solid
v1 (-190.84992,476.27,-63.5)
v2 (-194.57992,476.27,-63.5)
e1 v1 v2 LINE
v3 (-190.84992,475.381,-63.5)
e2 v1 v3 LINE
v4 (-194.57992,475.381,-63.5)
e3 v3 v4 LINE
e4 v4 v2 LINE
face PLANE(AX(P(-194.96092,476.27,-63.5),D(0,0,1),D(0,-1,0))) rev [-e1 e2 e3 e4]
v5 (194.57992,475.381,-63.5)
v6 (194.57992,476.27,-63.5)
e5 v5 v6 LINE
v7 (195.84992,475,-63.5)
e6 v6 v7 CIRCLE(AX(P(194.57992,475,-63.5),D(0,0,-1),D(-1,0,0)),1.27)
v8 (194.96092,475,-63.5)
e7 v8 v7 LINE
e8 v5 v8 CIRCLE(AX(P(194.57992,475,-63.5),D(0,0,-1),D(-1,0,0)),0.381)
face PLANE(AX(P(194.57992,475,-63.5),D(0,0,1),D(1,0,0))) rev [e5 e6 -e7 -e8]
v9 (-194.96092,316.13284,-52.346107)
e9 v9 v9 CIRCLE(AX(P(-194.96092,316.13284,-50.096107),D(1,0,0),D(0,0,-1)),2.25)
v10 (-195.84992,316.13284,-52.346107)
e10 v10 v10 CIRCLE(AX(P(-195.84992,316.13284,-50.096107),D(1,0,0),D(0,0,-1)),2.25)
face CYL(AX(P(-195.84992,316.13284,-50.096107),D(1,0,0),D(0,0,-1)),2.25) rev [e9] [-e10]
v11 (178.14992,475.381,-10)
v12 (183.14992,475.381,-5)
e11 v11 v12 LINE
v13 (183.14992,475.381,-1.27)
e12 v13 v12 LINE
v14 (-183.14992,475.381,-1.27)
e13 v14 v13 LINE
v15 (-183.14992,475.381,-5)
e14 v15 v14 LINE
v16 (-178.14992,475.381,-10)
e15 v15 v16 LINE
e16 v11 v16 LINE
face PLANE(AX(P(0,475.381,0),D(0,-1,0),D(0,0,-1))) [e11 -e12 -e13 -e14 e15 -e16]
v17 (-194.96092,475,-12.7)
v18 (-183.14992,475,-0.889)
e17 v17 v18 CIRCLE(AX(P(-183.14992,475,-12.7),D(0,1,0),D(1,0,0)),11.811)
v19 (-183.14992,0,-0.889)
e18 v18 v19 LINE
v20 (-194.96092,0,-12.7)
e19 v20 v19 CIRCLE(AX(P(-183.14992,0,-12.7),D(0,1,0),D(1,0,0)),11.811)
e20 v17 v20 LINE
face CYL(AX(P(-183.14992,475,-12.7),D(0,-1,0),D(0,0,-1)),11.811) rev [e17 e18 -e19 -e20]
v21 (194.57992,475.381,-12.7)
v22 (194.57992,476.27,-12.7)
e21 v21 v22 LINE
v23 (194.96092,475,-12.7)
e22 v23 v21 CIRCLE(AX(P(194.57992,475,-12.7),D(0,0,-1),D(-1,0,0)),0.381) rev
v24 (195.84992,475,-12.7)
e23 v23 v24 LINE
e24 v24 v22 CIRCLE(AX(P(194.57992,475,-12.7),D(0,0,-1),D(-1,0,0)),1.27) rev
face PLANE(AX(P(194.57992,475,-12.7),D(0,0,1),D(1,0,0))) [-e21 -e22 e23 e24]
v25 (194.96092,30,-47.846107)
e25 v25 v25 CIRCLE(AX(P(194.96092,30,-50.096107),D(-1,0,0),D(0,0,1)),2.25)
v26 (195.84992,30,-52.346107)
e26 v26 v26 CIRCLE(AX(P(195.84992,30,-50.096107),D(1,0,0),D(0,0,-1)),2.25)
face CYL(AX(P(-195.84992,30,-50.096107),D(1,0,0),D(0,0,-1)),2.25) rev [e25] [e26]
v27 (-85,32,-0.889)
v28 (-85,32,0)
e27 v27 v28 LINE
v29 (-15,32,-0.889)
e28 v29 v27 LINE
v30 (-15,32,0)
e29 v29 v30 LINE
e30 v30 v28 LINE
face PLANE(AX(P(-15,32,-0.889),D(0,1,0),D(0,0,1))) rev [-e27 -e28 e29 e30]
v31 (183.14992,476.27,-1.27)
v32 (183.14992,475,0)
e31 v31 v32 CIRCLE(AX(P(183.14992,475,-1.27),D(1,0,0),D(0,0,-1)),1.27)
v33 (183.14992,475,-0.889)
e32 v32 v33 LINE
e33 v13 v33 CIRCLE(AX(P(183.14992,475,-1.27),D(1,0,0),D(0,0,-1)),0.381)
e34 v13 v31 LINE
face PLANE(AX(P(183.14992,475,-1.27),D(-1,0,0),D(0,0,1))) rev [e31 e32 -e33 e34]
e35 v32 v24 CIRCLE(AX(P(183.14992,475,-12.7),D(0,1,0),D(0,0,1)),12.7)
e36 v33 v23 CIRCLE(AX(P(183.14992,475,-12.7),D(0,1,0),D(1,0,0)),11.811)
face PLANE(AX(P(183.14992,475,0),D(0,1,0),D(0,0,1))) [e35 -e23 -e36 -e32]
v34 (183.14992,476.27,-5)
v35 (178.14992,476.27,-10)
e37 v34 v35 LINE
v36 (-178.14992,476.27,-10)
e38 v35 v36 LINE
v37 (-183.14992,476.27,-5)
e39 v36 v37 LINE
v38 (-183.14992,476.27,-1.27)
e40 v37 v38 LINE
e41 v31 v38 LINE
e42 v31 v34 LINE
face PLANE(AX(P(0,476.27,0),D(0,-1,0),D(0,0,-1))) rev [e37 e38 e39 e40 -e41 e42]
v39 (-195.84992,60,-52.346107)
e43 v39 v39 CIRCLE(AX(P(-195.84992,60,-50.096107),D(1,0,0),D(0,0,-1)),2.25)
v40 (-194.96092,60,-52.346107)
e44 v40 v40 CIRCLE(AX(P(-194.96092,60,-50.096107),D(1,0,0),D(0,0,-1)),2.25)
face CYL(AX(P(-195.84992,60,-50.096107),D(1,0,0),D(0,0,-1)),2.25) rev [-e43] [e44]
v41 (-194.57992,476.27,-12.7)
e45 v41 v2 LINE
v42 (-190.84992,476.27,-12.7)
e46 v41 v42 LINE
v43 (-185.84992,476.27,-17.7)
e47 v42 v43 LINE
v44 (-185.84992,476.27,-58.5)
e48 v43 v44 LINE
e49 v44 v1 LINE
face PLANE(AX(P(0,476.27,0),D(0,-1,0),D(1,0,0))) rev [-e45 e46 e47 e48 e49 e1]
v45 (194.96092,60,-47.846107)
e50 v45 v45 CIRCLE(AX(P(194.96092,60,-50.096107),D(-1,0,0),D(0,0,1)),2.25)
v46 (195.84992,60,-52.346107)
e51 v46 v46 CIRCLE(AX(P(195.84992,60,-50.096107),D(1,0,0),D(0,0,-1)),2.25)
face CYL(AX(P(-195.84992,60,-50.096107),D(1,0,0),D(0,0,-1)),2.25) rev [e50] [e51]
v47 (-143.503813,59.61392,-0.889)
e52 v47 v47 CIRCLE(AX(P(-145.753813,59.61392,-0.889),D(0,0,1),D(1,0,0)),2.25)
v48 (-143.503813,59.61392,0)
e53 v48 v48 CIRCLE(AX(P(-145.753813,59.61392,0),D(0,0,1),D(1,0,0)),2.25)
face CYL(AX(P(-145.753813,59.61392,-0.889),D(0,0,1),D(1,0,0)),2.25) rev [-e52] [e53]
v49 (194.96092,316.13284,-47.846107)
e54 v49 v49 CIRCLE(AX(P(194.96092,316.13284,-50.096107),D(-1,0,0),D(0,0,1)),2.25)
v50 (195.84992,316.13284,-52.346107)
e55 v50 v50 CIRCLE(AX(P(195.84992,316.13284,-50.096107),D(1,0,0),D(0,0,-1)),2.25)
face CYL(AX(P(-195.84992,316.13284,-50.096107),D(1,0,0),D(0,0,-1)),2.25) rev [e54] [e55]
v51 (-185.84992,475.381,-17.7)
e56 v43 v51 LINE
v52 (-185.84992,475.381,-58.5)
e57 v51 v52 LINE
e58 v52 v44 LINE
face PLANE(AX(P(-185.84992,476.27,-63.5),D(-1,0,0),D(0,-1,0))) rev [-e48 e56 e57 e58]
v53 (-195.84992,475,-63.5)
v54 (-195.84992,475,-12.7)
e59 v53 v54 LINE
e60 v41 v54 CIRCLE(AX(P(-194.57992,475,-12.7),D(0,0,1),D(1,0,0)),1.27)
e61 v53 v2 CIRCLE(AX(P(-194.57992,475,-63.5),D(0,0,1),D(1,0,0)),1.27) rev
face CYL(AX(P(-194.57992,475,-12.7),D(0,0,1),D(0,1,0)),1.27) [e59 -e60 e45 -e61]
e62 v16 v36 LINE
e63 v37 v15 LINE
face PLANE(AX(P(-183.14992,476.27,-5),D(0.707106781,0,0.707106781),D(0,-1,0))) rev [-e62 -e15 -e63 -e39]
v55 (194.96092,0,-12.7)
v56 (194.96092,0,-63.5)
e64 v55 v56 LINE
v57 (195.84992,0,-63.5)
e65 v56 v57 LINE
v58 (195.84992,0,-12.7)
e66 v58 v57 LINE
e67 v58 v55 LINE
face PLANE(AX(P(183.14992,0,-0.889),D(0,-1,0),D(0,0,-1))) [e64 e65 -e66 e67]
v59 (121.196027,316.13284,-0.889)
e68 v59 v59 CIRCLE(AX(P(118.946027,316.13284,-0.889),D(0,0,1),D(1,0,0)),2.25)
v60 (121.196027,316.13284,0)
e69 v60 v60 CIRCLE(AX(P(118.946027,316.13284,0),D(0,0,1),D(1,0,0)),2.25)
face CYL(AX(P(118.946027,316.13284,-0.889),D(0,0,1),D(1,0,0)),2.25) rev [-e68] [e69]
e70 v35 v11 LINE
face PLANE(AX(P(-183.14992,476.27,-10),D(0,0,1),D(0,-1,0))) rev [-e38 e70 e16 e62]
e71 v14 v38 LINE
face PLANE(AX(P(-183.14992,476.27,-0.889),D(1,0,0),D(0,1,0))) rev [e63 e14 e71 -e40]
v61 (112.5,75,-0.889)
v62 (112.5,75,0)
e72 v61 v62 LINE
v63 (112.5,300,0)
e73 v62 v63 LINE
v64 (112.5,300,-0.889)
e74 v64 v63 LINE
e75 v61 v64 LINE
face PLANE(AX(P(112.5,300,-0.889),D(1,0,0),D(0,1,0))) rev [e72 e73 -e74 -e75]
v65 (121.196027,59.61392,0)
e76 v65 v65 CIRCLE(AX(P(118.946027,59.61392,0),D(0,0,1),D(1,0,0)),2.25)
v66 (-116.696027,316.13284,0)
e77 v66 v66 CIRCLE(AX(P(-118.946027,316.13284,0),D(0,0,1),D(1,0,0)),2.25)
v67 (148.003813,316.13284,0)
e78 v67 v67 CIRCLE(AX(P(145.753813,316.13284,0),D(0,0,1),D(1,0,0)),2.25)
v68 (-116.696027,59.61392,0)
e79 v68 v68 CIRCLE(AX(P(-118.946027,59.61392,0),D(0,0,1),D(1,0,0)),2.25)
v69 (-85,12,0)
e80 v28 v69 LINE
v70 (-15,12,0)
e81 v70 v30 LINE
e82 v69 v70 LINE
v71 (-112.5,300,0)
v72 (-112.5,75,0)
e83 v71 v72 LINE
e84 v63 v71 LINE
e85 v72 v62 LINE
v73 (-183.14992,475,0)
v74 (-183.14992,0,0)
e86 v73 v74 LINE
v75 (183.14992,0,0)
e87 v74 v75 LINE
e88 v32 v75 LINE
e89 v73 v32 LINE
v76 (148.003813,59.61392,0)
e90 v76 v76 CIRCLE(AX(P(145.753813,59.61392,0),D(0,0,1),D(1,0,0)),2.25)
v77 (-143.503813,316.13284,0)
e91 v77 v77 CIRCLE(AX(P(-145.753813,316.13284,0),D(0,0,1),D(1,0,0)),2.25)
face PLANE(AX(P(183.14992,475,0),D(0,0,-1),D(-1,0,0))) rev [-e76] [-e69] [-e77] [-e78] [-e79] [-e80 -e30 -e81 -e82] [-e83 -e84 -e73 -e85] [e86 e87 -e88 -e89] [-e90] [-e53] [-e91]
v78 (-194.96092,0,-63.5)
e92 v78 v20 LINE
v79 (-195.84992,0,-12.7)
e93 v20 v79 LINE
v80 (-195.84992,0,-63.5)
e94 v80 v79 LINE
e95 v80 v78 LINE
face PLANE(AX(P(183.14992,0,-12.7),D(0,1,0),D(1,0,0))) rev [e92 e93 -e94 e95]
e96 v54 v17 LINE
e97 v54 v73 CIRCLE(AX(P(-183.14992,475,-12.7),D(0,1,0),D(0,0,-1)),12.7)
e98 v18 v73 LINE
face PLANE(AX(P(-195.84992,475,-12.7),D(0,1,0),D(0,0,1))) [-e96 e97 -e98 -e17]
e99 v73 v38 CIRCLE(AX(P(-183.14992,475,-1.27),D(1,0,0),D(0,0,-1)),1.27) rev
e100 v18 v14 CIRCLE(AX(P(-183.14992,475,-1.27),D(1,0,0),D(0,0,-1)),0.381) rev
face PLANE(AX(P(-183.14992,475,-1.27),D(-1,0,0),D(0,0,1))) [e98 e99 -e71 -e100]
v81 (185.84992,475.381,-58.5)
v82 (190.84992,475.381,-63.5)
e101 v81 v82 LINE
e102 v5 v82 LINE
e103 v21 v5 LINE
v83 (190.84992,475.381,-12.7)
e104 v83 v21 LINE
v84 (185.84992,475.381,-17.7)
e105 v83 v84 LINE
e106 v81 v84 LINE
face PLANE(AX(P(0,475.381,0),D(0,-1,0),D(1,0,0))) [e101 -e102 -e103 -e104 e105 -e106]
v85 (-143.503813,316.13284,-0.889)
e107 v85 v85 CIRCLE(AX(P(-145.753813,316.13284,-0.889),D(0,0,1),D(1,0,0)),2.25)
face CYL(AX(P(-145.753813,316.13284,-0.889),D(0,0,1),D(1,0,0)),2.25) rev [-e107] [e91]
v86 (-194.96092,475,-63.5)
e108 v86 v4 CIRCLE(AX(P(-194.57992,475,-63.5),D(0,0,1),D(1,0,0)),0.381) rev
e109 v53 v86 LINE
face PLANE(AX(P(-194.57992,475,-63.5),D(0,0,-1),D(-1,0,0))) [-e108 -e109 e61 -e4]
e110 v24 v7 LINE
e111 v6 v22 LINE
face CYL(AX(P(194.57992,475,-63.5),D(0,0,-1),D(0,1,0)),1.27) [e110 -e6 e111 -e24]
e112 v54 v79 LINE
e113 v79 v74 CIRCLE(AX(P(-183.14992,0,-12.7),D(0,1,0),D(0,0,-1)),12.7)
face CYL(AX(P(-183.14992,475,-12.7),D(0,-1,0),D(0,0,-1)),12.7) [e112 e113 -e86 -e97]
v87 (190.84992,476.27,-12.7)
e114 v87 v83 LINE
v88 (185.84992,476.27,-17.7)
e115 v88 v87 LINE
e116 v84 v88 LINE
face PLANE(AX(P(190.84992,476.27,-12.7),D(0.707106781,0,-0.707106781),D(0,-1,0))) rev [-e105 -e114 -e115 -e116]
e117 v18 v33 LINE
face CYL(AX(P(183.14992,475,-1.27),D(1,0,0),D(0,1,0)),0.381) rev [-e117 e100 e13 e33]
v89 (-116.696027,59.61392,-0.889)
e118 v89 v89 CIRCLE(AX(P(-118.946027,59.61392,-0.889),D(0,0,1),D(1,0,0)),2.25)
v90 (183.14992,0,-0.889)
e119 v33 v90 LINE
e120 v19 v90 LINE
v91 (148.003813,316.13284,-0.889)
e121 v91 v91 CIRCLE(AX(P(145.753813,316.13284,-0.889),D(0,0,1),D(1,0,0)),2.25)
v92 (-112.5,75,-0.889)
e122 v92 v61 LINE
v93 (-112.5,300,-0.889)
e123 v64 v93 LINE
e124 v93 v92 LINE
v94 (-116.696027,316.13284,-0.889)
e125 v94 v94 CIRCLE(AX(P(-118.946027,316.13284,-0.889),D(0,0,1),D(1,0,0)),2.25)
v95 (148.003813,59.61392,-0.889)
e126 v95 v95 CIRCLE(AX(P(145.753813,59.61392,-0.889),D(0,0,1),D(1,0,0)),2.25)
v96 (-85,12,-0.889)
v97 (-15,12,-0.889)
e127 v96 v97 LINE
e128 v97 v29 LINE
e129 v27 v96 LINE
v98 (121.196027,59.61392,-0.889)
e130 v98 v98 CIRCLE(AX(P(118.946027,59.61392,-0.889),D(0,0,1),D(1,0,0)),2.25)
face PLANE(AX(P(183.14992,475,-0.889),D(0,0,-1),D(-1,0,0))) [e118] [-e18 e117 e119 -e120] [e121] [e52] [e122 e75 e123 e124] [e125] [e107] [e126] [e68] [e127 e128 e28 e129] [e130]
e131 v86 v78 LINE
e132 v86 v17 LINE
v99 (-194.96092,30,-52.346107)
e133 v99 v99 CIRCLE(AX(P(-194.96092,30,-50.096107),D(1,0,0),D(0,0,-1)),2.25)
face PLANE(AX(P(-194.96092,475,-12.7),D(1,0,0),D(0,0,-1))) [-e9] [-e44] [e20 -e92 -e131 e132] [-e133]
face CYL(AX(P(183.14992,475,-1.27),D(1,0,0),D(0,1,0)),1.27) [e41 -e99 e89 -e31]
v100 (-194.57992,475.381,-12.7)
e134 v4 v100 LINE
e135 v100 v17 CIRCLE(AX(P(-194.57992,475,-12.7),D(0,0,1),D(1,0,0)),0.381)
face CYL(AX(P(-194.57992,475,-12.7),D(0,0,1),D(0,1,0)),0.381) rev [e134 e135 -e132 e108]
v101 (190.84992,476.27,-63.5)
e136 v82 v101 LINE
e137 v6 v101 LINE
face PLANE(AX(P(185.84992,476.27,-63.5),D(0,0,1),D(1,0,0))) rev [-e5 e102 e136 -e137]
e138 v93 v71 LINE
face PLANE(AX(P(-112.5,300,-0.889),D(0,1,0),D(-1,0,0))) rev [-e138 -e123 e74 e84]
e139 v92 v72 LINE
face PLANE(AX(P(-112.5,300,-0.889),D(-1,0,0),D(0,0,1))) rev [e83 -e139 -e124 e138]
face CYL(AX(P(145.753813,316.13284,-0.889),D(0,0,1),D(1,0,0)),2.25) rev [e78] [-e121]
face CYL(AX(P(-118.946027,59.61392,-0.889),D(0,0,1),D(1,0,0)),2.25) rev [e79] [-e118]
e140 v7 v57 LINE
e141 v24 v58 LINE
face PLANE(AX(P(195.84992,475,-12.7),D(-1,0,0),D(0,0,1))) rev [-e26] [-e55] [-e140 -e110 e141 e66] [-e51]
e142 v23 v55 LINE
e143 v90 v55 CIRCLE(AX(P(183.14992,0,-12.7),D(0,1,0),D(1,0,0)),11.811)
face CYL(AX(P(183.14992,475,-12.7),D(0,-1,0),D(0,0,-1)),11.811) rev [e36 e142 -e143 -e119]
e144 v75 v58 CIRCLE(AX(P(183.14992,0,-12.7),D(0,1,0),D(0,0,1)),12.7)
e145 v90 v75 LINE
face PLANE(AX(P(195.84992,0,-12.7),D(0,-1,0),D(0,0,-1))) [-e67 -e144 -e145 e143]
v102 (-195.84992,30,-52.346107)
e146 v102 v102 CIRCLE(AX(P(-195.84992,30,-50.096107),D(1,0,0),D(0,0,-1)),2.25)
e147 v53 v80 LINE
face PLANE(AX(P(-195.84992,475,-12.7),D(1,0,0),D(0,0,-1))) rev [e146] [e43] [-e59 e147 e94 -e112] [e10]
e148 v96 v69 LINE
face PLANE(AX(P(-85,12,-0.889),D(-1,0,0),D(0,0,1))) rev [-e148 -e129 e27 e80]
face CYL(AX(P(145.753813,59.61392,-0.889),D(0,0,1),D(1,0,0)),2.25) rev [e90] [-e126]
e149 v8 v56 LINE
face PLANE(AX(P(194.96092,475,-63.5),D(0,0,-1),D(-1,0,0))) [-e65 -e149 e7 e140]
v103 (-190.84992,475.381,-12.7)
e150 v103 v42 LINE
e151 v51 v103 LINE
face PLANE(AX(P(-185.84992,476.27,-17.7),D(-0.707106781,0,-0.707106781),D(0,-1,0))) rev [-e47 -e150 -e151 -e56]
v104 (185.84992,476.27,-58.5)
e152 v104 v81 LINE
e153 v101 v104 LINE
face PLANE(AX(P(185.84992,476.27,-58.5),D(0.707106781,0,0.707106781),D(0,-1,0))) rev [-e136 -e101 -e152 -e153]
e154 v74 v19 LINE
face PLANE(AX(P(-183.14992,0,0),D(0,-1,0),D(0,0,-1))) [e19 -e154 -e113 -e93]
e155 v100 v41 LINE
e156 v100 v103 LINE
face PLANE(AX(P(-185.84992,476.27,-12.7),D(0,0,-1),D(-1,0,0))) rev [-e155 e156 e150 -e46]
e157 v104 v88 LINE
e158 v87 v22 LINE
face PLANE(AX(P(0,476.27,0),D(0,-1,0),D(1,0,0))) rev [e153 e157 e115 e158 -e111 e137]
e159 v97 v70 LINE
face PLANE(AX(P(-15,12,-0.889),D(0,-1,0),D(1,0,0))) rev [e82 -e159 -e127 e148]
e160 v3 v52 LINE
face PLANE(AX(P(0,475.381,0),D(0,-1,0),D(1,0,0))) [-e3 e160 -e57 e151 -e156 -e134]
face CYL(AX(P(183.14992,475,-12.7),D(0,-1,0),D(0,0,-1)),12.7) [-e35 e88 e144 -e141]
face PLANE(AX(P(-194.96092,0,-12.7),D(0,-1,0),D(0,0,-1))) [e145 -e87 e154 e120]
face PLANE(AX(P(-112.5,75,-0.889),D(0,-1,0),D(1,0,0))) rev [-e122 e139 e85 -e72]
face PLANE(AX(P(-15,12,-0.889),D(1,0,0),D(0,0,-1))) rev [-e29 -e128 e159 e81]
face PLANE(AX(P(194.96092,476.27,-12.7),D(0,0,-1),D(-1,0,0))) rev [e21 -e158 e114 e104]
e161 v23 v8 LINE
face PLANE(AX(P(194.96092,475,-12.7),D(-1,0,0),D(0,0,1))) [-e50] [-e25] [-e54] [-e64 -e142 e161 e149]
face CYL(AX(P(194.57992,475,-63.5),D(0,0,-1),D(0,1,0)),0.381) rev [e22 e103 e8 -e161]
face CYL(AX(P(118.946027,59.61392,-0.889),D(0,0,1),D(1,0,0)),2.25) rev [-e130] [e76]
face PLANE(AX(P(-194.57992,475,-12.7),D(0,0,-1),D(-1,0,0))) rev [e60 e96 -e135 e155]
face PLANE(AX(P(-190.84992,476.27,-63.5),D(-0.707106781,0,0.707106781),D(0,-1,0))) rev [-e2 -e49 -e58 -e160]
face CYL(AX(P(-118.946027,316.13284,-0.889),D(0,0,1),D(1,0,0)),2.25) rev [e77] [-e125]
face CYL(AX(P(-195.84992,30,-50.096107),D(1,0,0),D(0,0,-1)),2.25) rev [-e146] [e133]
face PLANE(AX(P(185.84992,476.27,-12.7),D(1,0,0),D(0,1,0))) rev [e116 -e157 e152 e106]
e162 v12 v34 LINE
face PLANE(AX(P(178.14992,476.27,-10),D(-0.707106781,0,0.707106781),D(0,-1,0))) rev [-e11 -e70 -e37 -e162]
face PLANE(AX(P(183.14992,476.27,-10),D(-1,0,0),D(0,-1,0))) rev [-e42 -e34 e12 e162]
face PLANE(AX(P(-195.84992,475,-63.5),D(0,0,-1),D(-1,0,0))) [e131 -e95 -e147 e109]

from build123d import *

# Parameters (mm, degrees)
BASE_FLANGE2_DEPTH        = 475
SKETCH6_W                 = 225
SKETCH6_H                 = 225
CUT_EXTRUDE2_DEPTH        = 2.54
SKETCH13_R                = 2.25
CUT_EXTRUDE4_DEPTH        = 619.939427238
SKETCH14_R                = 2.25
CUT_EXTRUDE5_DEPTH        = 0.889
SKETCH15_W                = 70
SKETCH15_H                = 20
CUT_EXTRUDE6_DEPTH        = 0.889
EDGE_FLANGE1_DEPTH        = 50.8
EDGE_FLANGE1_BEND_DEPTH   = 366.299839916
EDGE_FLANGE1_BEND_2_DEPTH = 50.8
BREAK_CORNER1_START       = 475.381
BREAK_CORNER1_DEPTH       = 0.889


# Read off the part's stored shape, not the designer's step: Break-Corner1
# Sheet-metal steps are written as plain solids
with BuildPart() as part:
    # Sketch1 → Base-Flange2 (new body)
    with BuildSketch(Plane(origin=(0, 0, 0), x_dir=(1, 0, 0), z_dir=(0, 1, 0))):
        with BuildLine():
            Line((195.849919958, 63.5), (195.849919958, 12.7))
            ThreePointArc((195.849919958, 12.7), (192.130176079, 3.719743879), (183.149919958, 0))
            Line((183.149919958, 0), (-183.149919958, 0))
            ThreePointArc((-183.149919958, 0), (-192.130176079, 3.719743879), (-195.849919958, 12.7))
            Line((-195.849919958, 12.7), (-195.849919958, 63.5))
            Line((-195.849919958, 63.5), (-194.960919958, 63.5))
            Line((-194.960919958, 63.5), (-194.960919958, 12.7))
            ThreePointArc((-194.960919958, 12.7), (-191.501558151, 4.348361807), (-183.149919958, 0.889))
            Line((-183.149919958, 0.889), (183.149919958, 0.889))
            ThreePointArc((183.149919958, 0.889), (191.501558151, 4.348361807), (194.960919958, 12.7))
            Line((194.960919958, 12.7), (194.960919958, 63.5))
            Line((194.960919958, 63.5), (195.849919958, 63.5))
        make_face()
    extrude(amount=BASE_FLANGE2_DEPTH)

    # Sketch6 → Cut-Extrude2 (cut)
    with BuildSketch(Plane.XY):
        with Locations((0, 187.5)):
            Rectangle(SKETCH6_W, SKETCH6_H)
    extrude(amount=-CUT_EXTRUDE2_DEPTH, mode=Mode.SUBTRACT)

    # Sketch13 → Cut-Extrude4 (cut, through all)
    with BuildSketch(Plane(origin=(195.849919958, 0, 0), x_dir=(0, 0, -1), z_dir=(1, 0, 0))):
        with Locations((50.096107, 60)):
            Circle(SKETCH13_R)
        with Locations((50.096107, 316.132840032)):
            Circle(SKETCH13_R)
        with Locations((50.096107, 30)):
            Circle(SKETCH13_R)
    extrude(amount=-CUT_EXTRUDE4_DEPTH, mode=Mode.SUBTRACT)

    # Sketch14 → Cut-Extrude5 (cut)
    with BuildSketch(Plane.XY):
        with Locations((-145.753813013, 316.132839976)):
            Circle(SKETCH14_R)
        with Locations((-118.946026903, 316.132839976)):
            Circle(SKETCH14_R)
        with Locations((118.946026903, 316.132839976)):
            Circle(SKETCH14_R)
        with Locations((145.753813013, 316.132839976)):
            Circle(SKETCH14_R)
        with Locations((145.753813013, 59.61392)):
            Circle(SKETCH14_R)
        with Locations((118.946026903, 59.61392)):
            Circle(SKETCH14_R)
        with Locations((-118.946026903, 59.61392)):
            Circle(SKETCH14_R)
        with Locations((-145.753813013, 59.61392)):
            Circle(SKETCH14_R)
    extrude(amount=-CUT_EXTRUDE5_DEPTH, mode=Mode.SUBTRACT)

    # Sketch15 → Cut-Extrude6 (cut)
    with BuildSketch(Plane.XY):
        with Locations((-50, 22)):
            Rectangle(SKETCH15_W, SKETCH15_H)
    extrude(amount=-CUT_EXTRUDE6_DEPTH, mode=Mode.SUBTRACT)

    # Edge-Flange1 section (across the edge) → Edge-Flange1 (add)
    with BuildSketch(Plane(origin=(-194.960919958, 475.381, -63.5), x_dir=(0, -1, 0), z_dir=(0, 0, 1))):
        with BuildLine():
            Line((-0.889, 0.381), (-0.889, 9.111))
            Line((-0.889, 9.111), (0, 9.111))
            Line((0, 9.111), (0, 0.381))
            ThreePointArc((0, 0.381), (0.111592316, 0.111592316), (0.381, 0))
            Line((0.381, 0), (0.381, -0.889))
            ThreePointArc((0.381, -0.889), (-0.517025612, -0.517025612), (-0.889, 0.381))
        make_face()
    extrude(amount=EDGE_FLANGE1_DEPTH)

    # Edge-Flange1 section 2 (across the edge) → Edge-Flange1 bend (add)
    with BuildSketch(Plane(origin=(-183.149919958, 475.381, -0.889), x_dir=(0, -1, 0), z_dir=(1, 0, 0))):
        with BuildLine():
            Line((-0.889, 0.381), (-0.889, 9.111))
            Line((-0.889, 9.111), (0, 9.111))
            Line((0, 9.111), (0, 0.381))
            ThreePointArc((0, 0.381), (0.111592316, 0.111592316), (0.381, 0))
            Line((0.381, 0), (0.381, -0.889))
            ThreePointArc((0.381, -0.889), (-0.517025612, -0.517025612), (-0.889, 0.381))
        make_face()
    extrude(amount=EDGE_FLANGE1_BEND_DEPTH)

    # Edge-Flange1 section 3 (across the edge) → Edge-Flange1 bend 2 (add)
    with BuildSketch(Plane(origin=(194.960919958, 475.381, -12.7), x_dir=(0, -1, 0), z_dir=(0, 0, -1))):
        with BuildLine():
            Line((-0.889, 0.381), (-0.889, 9.111))
            Line((-0.889, 9.111), (0, 9.111))
            Line((0, 9.111), (0, 0.381))
            ThreePointArc((0, 0.381), (0.111592316, 0.111592316), (0.381, 0))
            Line((0.381, 0), (0.381, -0.889))
            ThreePointArc((0.381, -0.889), (-0.517025612, -0.517025612), (-0.889, 0.381))
        make_face()
    extrude(amount=EDGE_FLANGE1_BEND_2_DEPTH)

    # Break-Corner1 outline → Break-Corner1 (cut)
    with BuildSketch(Plane(origin=(0, 0, 0), x_dir=(1, 0, 0), z_dir=(0, 1, 0)).offset(BREAK_CORNER1_START)):
        Polygon((183.149919958, 10), (178.149919958, 10), (183.149919958, 5), align=None)
        Polygon((-183.149919958, 5), (-178.149919958, 10), (-183.149919958, 10), align=None)
        Polygon((185.849919958, 63.5), (185.849919958, 58.5), (190.849919958, 63.5), align=None)
        Polygon((190.849919958, 12.7), (185.849919958, 17.7), (185.849919958, 12.7), align=None)
        Polygon((-185.849919958, 12.7), (-185.849919958, 17.7), (-190.849919958, 12.7), align=None)
        Polygon((-190.849919958, 63.5), (-185.849919958, 58.5), (-185.849919958, 63.5), align=None)
    extrude(amount=BREAK_CORNER1_DEPTH, mode=Mode.SUBTRACT)


solid = part.part
